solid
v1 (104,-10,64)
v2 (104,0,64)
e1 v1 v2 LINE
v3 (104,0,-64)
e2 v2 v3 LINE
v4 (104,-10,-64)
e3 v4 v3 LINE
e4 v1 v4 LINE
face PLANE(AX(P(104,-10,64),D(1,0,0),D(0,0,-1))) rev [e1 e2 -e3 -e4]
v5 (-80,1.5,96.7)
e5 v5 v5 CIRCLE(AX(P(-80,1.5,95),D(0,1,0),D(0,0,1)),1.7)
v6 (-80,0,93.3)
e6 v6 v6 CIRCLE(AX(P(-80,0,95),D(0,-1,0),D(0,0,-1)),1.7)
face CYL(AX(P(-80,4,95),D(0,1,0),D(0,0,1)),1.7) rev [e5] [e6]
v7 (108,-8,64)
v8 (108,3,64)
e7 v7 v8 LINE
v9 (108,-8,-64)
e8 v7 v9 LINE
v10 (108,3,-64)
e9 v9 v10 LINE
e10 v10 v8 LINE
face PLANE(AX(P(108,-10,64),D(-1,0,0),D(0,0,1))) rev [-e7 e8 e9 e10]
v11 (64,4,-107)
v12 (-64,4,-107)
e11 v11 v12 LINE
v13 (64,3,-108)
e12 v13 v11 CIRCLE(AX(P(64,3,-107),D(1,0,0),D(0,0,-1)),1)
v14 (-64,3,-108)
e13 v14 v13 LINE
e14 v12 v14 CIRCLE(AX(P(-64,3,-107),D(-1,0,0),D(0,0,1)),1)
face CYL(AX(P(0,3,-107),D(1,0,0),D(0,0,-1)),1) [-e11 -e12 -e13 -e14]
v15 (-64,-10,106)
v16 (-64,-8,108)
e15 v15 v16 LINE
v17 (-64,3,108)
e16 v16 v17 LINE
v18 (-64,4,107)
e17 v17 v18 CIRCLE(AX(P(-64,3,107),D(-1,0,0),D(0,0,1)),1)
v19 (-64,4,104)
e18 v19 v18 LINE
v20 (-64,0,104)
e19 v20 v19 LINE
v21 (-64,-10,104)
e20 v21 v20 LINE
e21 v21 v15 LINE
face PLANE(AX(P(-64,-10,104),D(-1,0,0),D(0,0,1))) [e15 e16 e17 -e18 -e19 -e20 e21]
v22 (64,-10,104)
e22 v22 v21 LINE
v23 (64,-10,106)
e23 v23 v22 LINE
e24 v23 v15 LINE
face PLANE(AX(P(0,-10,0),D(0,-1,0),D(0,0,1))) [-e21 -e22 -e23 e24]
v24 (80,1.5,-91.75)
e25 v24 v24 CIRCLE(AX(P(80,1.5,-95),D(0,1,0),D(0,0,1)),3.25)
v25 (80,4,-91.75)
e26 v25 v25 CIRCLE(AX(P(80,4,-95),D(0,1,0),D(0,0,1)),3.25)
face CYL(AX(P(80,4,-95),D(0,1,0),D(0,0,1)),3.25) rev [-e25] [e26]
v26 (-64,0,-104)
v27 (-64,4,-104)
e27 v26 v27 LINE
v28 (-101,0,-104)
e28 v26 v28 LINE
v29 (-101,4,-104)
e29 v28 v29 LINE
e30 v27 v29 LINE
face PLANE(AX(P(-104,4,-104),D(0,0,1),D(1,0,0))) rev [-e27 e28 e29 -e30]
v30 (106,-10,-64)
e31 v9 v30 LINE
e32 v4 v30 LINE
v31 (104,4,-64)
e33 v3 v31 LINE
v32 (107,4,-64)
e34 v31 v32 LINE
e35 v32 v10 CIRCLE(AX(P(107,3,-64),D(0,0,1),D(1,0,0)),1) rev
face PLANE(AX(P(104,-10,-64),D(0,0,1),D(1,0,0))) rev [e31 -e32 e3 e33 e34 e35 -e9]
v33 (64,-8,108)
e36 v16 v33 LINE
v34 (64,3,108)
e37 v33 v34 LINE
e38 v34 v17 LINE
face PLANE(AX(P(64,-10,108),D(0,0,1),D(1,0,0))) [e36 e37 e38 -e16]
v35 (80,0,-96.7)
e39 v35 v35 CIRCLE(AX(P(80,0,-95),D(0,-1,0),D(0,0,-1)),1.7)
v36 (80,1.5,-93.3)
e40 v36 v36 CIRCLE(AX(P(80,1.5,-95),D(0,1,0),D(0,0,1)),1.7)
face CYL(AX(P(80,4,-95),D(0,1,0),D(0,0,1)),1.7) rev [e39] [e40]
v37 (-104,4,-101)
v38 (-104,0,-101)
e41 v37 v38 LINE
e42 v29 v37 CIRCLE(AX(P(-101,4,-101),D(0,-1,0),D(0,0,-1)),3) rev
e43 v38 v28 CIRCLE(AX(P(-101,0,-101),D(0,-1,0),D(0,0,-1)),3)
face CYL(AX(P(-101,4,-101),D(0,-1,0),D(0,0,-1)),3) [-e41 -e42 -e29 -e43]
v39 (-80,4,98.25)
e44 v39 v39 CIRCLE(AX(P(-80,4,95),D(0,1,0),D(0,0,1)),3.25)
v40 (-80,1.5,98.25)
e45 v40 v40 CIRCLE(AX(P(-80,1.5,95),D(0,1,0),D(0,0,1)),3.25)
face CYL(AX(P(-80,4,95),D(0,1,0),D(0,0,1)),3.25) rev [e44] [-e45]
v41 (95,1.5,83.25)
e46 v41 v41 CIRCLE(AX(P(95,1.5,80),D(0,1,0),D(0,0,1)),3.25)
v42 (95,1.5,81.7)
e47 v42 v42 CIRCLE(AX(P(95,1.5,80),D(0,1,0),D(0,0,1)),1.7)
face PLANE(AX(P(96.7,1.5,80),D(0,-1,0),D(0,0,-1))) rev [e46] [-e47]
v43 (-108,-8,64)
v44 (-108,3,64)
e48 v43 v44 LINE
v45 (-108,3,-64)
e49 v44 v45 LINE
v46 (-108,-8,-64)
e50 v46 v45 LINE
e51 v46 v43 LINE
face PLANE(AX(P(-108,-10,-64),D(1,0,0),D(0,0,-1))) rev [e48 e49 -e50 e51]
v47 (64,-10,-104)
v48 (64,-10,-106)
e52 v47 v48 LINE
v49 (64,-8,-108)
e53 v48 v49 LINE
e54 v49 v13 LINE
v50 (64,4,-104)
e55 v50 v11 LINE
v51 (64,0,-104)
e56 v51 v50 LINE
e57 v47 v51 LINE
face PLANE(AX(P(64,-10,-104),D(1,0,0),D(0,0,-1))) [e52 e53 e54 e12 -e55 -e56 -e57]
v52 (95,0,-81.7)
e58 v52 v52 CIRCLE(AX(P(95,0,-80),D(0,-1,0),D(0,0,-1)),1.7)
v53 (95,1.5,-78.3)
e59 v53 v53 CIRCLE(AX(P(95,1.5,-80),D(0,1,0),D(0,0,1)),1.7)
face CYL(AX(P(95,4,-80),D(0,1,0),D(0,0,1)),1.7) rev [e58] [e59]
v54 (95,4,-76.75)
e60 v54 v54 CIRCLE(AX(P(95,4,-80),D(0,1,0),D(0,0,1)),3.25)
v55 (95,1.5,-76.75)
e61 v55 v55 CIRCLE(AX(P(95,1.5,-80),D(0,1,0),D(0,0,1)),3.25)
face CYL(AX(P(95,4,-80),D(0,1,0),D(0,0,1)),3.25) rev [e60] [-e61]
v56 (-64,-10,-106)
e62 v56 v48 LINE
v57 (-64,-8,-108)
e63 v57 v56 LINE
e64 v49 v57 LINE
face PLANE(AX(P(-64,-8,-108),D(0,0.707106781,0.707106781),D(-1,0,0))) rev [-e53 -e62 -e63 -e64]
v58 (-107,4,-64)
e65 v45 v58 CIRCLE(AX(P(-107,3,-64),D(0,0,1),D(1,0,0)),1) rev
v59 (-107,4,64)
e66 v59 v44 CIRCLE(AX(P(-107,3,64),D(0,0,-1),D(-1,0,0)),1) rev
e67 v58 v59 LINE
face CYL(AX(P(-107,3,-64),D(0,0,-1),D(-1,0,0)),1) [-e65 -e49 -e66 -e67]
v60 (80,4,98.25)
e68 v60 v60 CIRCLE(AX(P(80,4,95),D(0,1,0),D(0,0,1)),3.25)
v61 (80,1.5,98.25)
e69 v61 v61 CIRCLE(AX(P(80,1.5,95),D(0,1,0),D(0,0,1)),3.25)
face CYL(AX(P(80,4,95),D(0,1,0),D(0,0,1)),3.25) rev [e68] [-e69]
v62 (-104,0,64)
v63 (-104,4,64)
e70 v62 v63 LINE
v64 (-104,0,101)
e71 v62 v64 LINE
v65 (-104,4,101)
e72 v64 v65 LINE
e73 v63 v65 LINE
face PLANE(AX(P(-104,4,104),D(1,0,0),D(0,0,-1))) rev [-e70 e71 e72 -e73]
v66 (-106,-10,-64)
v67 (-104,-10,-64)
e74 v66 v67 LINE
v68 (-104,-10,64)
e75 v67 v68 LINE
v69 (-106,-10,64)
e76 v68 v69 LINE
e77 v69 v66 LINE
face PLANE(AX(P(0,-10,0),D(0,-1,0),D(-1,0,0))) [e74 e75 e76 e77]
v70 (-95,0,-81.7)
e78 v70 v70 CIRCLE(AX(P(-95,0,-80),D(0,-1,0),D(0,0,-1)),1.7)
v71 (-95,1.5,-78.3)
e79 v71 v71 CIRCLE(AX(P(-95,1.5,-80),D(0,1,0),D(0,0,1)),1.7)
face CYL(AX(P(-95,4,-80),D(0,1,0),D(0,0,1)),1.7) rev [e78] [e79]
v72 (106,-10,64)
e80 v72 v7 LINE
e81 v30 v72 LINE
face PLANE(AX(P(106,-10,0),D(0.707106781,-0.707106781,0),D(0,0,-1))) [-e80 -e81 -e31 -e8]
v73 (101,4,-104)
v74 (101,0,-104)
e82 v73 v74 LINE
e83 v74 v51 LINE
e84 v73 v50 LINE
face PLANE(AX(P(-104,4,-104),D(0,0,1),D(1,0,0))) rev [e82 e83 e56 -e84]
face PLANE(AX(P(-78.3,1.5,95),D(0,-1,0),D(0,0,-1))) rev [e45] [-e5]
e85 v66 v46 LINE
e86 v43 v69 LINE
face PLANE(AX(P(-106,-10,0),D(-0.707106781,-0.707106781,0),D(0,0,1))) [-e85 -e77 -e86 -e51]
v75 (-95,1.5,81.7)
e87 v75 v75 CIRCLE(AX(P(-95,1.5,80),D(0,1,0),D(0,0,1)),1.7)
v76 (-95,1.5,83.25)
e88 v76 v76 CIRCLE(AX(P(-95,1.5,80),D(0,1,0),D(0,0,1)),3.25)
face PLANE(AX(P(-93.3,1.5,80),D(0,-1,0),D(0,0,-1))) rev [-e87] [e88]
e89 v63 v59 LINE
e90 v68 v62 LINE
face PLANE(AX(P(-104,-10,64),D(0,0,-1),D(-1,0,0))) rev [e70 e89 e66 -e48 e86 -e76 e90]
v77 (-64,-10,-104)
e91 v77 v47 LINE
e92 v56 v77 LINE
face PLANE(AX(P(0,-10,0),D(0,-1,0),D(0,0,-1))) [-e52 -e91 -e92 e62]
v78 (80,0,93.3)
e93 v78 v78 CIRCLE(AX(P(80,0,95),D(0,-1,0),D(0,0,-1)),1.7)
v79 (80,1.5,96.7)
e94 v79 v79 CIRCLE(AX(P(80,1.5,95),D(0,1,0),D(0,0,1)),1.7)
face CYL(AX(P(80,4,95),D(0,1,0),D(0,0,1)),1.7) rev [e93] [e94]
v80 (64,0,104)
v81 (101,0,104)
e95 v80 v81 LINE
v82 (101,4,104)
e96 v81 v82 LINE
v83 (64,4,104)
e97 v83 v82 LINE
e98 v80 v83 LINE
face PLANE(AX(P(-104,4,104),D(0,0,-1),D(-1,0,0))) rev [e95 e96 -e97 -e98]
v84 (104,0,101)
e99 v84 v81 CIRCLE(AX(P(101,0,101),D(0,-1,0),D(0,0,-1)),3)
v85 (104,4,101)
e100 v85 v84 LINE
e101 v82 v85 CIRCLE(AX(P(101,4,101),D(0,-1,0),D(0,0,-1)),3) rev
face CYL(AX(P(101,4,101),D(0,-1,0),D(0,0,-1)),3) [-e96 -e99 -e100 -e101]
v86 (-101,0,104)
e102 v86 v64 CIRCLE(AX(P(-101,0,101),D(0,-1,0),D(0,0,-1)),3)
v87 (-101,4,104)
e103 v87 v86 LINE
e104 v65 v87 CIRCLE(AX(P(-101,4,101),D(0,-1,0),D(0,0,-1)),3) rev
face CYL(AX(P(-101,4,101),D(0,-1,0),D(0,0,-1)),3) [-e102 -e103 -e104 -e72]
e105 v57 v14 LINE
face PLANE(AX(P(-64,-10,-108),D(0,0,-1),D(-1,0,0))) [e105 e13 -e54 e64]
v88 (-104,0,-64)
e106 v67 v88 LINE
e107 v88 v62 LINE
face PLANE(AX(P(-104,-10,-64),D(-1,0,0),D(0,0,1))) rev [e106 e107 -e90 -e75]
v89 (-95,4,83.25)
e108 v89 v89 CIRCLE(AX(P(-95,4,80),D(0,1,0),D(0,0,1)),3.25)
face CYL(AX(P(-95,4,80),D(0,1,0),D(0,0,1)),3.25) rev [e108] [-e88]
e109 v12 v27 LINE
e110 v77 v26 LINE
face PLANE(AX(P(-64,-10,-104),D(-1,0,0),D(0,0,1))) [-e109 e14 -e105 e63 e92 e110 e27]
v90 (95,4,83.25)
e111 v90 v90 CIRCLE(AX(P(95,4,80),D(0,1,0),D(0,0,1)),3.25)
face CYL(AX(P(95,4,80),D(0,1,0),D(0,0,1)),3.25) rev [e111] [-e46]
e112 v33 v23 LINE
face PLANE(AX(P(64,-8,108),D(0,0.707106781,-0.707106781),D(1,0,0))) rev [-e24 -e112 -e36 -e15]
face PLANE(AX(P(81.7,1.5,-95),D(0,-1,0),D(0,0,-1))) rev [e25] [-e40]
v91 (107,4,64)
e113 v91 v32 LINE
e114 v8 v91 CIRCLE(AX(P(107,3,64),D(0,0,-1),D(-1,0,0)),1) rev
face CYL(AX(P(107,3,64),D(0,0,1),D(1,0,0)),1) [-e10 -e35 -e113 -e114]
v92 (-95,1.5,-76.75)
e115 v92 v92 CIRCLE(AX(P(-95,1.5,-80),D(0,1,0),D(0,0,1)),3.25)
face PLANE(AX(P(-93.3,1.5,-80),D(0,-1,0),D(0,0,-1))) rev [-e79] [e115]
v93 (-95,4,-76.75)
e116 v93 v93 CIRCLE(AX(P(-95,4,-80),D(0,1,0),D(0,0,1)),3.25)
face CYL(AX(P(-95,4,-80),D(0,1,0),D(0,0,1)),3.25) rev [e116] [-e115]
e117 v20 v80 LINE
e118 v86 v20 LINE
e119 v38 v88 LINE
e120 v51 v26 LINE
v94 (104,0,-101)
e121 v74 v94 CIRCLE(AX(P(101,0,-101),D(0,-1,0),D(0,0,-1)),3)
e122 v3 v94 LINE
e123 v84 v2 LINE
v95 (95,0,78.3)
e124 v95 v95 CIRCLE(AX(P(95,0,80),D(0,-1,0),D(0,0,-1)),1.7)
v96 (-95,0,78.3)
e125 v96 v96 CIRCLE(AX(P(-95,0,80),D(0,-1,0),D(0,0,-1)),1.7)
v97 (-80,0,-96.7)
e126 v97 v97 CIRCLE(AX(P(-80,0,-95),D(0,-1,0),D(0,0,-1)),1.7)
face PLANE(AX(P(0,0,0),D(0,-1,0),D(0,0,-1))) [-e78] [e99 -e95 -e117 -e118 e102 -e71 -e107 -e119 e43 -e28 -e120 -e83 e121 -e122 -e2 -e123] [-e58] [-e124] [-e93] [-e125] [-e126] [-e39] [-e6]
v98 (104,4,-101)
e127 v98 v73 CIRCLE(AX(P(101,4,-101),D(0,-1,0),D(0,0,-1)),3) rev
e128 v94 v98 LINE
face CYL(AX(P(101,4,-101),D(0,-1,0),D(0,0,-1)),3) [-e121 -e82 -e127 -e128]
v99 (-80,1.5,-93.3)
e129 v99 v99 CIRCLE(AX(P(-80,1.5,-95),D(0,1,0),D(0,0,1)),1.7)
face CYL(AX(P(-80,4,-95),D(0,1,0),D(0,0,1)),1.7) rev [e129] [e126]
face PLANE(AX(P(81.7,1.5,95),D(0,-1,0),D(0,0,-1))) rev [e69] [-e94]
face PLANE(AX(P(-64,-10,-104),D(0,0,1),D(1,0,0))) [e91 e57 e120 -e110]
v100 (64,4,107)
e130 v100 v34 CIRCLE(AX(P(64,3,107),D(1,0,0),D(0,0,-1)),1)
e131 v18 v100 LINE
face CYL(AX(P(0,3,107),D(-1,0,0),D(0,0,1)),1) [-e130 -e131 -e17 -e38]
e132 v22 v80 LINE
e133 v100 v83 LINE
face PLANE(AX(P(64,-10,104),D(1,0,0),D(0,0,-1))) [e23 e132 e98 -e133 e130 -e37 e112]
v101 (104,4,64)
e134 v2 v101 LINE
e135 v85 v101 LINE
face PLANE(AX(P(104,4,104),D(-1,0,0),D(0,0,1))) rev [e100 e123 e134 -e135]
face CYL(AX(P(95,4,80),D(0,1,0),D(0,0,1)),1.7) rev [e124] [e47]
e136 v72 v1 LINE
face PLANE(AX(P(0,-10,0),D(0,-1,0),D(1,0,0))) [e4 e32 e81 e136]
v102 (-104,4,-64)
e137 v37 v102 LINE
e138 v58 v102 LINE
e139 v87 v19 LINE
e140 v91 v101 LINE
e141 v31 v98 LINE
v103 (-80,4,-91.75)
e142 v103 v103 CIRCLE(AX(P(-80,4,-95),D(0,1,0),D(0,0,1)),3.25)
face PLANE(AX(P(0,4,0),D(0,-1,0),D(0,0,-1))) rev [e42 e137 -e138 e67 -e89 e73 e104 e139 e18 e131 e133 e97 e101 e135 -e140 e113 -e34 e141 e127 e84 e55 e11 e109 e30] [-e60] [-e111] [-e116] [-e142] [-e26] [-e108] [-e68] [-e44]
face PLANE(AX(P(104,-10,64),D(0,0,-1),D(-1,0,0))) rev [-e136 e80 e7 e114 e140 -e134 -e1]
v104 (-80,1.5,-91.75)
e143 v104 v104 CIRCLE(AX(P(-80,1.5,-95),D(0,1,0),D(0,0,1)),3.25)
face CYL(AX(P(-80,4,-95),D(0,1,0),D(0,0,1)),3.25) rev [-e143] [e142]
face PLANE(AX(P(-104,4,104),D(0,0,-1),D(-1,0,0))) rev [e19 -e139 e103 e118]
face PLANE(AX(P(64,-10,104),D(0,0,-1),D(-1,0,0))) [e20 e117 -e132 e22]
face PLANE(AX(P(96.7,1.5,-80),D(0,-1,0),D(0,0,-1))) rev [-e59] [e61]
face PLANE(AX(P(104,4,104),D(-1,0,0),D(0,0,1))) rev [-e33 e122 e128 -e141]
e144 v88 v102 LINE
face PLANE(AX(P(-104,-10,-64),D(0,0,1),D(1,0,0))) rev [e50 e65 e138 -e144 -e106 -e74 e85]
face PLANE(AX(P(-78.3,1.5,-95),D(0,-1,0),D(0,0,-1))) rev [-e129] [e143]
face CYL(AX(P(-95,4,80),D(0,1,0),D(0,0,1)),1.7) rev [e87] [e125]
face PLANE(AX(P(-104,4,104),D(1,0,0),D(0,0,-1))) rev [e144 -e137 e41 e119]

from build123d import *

# Parameters (mm, degrees)
SKETCH1_W                                     = 208
SKETCH1_H                                     = 208
BASE_PLATE_DEPTH                              = 4
MOUNTING_HOLES_START                          = 1.5
MOUNTING_HOLES_OUTLINE_R                      = 3.25
MOUNTING_HOLES_DEPTH                          = 2.5
MOUNTING_HOLES_2_OUTLINE_R                    = 1.7
MOUNTING_HOLES_2_DEPTH                        = 1.5
MOUNTING_HOLES_MIRROR2_START                  = 1.5
MOUNTING_HOLES_MIRROR2_COPY_1_SKETCH_R        = 3.25
MOUNTING_HOLES_MIRROR2_COPY_1_DEPTH           = 2.5
MOUNTING_HOLES_MIRROR2_COPY_2_SKETCH_R        = 1.7
MOUNTING_HOLES_MIRROR2_COPY_2_DEPTH           = 1.5
MOUNTING_HOLES_MIRROR2_COPY_3_SKETCH_R        = 1.7
MOUNTING_HOLES_MIRROR2_COPY_3_DEPTH           = 1.5
SKETCH5_W                                     = 128
SKETCH5_H                                     = 4
SIDE_EXTRUSION_DEPTH                          = 14
SIDE_EXTRUSION_FILLET_R                       = 1
SIDE_EXTRUSION_CHAMFER_SIZE                   = 2
SIDE_EXTRUSION_FILLET_OF_SIDE_EXTRUSION_R     = 1
SIDE_EXTRUSION_CHAMFER_OF_SIDE_EXTRUSION_SIZE = 2
SIDE_EXTRUSION_MIRROR2_START                  = -64
SIDE_EXTRUSION_MIRROR2_DEPTH                  = 128
SIDE_EXTRUSION_MIRROR2_2_DEPTH                = 128
EDGE_FILLETS_R                                = 3


# Read off the part's stored shape, not the designer's step: mounting_holes, side_extrusion_mirror2
with BuildPart() as part:
    # Sketch1 → base_plate (new body)
    with BuildSketch(Plane(origin=(0, 0, 0), x_dir=(1, 0, 0), z_dir=(0, 1, 0))):
        Rectangle(SKETCH1_W, SKETCH1_H)
    extrude(amount=BASE_PLATE_DEPTH)

    # mounting_holes outline → mounting_holes (cut)
    with BuildSketch(Plane(origin=(0, 0, 0), x_dir=(1, 0, 0), z_dir=(0, 1, 0)).offset(MOUNTING_HOLES_START)):
        with Locations((95, 80)):
            Circle(MOUNTING_HOLES_OUTLINE_R)
        with Locations((80, 95)):
            Circle(MOUNTING_HOLES_OUTLINE_R)
    mounting_holes = extrude(amount=MOUNTING_HOLES_DEPTH, mode=Mode.SUBTRACT)

    # mounting_holes 2 outline → mounting_holes 2 (cut)
    with BuildSketch(Plane(origin=(0, 0, 0), x_dir=(1, 0, 0), z_dir=(0, 1, 0))):
        with Locations((95, 80)):
            Circle(MOUNTING_HOLES_2_OUTLINE_R)
        with Locations((80, 95)):
            Circle(MOUNTING_HOLES_2_OUTLINE_R)
    mounting_holes_2 = extrude(amount=MOUNTING_HOLES_2_DEPTH, mode=Mode.SUBTRACT)

    # mounting_holes_mirror1: mounting_holes, mounting_holes 2 across plane
    add(mounting_holes.mirror(Plane.XY), mode=Mode.SUBTRACT)
    add(mounting_holes_2.mirror(Plane.XY), mode=Mode.SUBTRACT)

    # mounting_holes_mirror2: mounting_holes, mounting_holes 2 across plane
    add(mounting_holes.mirror(Plane(origin=(0, 0, 0), x_dir=(0, 0, 1), z_dir=(1, 0, 0))), mode=Mode.SUBTRACT)
    add(mounting_holes_2.mirror(Plane(origin=(0, 0, 0), x_dir=(0, 0, 1), z_dir=(1, 0, 0))), mode=Mode.SUBTRACT)

    # mounting_holes_mirror2 copy 1 sketch → mounting_holes_mirror2 copy 1 (cut)
    with BuildSketch(Plane(origin=(0, 0, 0), x_dir=(-1, 0, 0), z_dir=(0, 1, 0)).offset(MOUNTING_HOLES_MIRROR2_START)):
        with Locations((95, 80)):
            Circle(MOUNTING_HOLES_MIRROR2_COPY_1_SKETCH_R)
        with Locations((80, 95)):
            Circle(MOUNTING_HOLES_MIRROR2_COPY_1_SKETCH_R)
    extrude(amount=MOUNTING_HOLES_MIRROR2_COPY_1_DEPTH, mode=Mode.SUBTRACT)

    # mounting_holes_mirror2 copy 2 sketch → mounting_holes_mirror2 copy 2 (cut)
    with BuildSketch(Plane(origin=(0, 0, 0), x_dir=(-1, 0, 0), z_dir=(0, 1, 0))):
        with Locations((95, 80)):
            Circle(MOUNTING_HOLES_MIRROR2_COPY_2_SKETCH_R)
        with Locations((80, 95)):
            Circle(MOUNTING_HOLES_MIRROR2_COPY_2_SKETCH_R)
    extrude(amount=MOUNTING_HOLES_MIRROR2_COPY_2_DEPTH, mode=Mode.SUBTRACT)

    # mounting_holes_mirror2 copy 3 sketch → mounting_holes_mirror2 copy 3 (cut)
    with BuildSketch(Plane(origin=(0, 0, 0), x_dir=(-1, 0, 0), z_dir=(0, 1, 0))):
        with Locations((95, -80)):
            Circle(MOUNTING_HOLES_MIRROR2_COPY_3_SKETCH_R)
        with Locations((80, -95)):
            Circle(MOUNTING_HOLES_MIRROR2_COPY_3_SKETCH_R)
    extrude(amount=MOUNTING_HOLES_MIRROR2_COPY_3_DEPTH, mode=Mode.SUBTRACT)

    # Sketch5 → side_extrusion (add)
    with BuildSketch(Plane(origin=(0, 4, 0), x_dir=(1, 0, 0), z_dir=(0, 1, 0))):
        with Locations((0, 106)):
            Rectangle(SKETCH5_W, SKETCH5_H)
    side_extrusion = extrude(amount=-SIDE_EXTRUSION_DEPTH)

    # side_extrusion_fillet
    side_extrusion_fillet_edges = [part.edges().sort_by_distance(p)[0] for p in [
        (0, 4, -108),
    ]]
    fillet(side_extrusion_fillet_edges, radius=SIDE_EXTRUSION_FILLET_R)

    # side_extrusion_chamfer
    side_extrusion_chamfer_edges = [part.edges().sort_by_distance(p)[0] for p in [
        (0, -10, -108),
    ]]
    chamfer(side_extrusion_chamfer_edges, length=SIDE_EXTRUSION_CHAMFER_SIZE)

    # side_extrusion_mirror1: side_extrusion across plane
    add(side_extrusion.mirror(Plane(origin=(0, 0, 0), x_dir=(0.7071067811865476, 0, 0.7071067811865476), z_dir=(0.7071067811865477, 0, -0.7071067811865475))))

    # side_extrusion_fillet of side_extrusion
    side_extrusion_fillet_of_side_extrusion_edges = [part.edges().sort_by_distance(p)[0] for p in [
        (-108, 4, 0),
    ]]
    fillet(side_extrusion_fillet_of_side_extrusion_edges, radius=SIDE_EXTRUSION_FILLET_OF_SIDE_EXTRUSION_R)

    # side_extrusion_chamfer of side_extrusion
    side_extrusion_chamfer_of_side_extrusion_edges = [part.edges().sort_by_distance(p)[0] for p in [
        (-108, -10, 0),
    ]]
    chamfer(side_extrusion_chamfer_of_side_extrusion_edges, length=SIDE_EXTRUSION_CHAMFER_OF_SIDE_EXTRUSION_SIZE)

    # side_extrusion_mirror2 outline → side_extrusion_mirror2 (add)
    with BuildSketch(Plane.YZ.offset(SIDE_EXTRUSION_MIRROR2_START)):
        with BuildLine():
            Line((-8, 108), (-10, 106))
            Line((-10, 106), (-10, 104))
            Line((-10, 104), (4, 104))
            Line((4, 104), (4, 107))
            ThreePointArc((4, 107), (3.707106781, 107.707106781), (3, 108))
            Line((3, 108), (-8, 108))
        make_face()
    extrude(amount=SIDE_EXTRUSION_MIRROR2_DEPTH)

    # side_extrusion_mirror2 2 outline → side_extrusion_mirror2 2 (add)
    with BuildSketch(Plane.XY.offset(SIDE_EXTRUSION_MIRROR2_START)):
        with BuildLine():
            Line((104, 4), (104, -10))
            Line((104, -10), (106, -10))
            Line((106, -10), (108, -8))
            Line((108, -8), (108, 3))
            ThreePointArc((108, 3), (107.707106781, 3.707106781), (107, 4))
            Line((107, 4), (104, 4))
        make_face()
    extrude(amount=SIDE_EXTRUSION_MIRROR2_2_DEPTH)

    # edge_fillets
    edge_fillets_edges = [part.edges().sort_by_distance(p)[0] for p in [
        (104, 2, 104),
        (-104, 2, 104),
        (-104, 2, -104),
        (104, 2, -104),
    ]]
    fillet(edge_fillets_edges, radius=EDGE_FILLETS_R)


solid = part.part
